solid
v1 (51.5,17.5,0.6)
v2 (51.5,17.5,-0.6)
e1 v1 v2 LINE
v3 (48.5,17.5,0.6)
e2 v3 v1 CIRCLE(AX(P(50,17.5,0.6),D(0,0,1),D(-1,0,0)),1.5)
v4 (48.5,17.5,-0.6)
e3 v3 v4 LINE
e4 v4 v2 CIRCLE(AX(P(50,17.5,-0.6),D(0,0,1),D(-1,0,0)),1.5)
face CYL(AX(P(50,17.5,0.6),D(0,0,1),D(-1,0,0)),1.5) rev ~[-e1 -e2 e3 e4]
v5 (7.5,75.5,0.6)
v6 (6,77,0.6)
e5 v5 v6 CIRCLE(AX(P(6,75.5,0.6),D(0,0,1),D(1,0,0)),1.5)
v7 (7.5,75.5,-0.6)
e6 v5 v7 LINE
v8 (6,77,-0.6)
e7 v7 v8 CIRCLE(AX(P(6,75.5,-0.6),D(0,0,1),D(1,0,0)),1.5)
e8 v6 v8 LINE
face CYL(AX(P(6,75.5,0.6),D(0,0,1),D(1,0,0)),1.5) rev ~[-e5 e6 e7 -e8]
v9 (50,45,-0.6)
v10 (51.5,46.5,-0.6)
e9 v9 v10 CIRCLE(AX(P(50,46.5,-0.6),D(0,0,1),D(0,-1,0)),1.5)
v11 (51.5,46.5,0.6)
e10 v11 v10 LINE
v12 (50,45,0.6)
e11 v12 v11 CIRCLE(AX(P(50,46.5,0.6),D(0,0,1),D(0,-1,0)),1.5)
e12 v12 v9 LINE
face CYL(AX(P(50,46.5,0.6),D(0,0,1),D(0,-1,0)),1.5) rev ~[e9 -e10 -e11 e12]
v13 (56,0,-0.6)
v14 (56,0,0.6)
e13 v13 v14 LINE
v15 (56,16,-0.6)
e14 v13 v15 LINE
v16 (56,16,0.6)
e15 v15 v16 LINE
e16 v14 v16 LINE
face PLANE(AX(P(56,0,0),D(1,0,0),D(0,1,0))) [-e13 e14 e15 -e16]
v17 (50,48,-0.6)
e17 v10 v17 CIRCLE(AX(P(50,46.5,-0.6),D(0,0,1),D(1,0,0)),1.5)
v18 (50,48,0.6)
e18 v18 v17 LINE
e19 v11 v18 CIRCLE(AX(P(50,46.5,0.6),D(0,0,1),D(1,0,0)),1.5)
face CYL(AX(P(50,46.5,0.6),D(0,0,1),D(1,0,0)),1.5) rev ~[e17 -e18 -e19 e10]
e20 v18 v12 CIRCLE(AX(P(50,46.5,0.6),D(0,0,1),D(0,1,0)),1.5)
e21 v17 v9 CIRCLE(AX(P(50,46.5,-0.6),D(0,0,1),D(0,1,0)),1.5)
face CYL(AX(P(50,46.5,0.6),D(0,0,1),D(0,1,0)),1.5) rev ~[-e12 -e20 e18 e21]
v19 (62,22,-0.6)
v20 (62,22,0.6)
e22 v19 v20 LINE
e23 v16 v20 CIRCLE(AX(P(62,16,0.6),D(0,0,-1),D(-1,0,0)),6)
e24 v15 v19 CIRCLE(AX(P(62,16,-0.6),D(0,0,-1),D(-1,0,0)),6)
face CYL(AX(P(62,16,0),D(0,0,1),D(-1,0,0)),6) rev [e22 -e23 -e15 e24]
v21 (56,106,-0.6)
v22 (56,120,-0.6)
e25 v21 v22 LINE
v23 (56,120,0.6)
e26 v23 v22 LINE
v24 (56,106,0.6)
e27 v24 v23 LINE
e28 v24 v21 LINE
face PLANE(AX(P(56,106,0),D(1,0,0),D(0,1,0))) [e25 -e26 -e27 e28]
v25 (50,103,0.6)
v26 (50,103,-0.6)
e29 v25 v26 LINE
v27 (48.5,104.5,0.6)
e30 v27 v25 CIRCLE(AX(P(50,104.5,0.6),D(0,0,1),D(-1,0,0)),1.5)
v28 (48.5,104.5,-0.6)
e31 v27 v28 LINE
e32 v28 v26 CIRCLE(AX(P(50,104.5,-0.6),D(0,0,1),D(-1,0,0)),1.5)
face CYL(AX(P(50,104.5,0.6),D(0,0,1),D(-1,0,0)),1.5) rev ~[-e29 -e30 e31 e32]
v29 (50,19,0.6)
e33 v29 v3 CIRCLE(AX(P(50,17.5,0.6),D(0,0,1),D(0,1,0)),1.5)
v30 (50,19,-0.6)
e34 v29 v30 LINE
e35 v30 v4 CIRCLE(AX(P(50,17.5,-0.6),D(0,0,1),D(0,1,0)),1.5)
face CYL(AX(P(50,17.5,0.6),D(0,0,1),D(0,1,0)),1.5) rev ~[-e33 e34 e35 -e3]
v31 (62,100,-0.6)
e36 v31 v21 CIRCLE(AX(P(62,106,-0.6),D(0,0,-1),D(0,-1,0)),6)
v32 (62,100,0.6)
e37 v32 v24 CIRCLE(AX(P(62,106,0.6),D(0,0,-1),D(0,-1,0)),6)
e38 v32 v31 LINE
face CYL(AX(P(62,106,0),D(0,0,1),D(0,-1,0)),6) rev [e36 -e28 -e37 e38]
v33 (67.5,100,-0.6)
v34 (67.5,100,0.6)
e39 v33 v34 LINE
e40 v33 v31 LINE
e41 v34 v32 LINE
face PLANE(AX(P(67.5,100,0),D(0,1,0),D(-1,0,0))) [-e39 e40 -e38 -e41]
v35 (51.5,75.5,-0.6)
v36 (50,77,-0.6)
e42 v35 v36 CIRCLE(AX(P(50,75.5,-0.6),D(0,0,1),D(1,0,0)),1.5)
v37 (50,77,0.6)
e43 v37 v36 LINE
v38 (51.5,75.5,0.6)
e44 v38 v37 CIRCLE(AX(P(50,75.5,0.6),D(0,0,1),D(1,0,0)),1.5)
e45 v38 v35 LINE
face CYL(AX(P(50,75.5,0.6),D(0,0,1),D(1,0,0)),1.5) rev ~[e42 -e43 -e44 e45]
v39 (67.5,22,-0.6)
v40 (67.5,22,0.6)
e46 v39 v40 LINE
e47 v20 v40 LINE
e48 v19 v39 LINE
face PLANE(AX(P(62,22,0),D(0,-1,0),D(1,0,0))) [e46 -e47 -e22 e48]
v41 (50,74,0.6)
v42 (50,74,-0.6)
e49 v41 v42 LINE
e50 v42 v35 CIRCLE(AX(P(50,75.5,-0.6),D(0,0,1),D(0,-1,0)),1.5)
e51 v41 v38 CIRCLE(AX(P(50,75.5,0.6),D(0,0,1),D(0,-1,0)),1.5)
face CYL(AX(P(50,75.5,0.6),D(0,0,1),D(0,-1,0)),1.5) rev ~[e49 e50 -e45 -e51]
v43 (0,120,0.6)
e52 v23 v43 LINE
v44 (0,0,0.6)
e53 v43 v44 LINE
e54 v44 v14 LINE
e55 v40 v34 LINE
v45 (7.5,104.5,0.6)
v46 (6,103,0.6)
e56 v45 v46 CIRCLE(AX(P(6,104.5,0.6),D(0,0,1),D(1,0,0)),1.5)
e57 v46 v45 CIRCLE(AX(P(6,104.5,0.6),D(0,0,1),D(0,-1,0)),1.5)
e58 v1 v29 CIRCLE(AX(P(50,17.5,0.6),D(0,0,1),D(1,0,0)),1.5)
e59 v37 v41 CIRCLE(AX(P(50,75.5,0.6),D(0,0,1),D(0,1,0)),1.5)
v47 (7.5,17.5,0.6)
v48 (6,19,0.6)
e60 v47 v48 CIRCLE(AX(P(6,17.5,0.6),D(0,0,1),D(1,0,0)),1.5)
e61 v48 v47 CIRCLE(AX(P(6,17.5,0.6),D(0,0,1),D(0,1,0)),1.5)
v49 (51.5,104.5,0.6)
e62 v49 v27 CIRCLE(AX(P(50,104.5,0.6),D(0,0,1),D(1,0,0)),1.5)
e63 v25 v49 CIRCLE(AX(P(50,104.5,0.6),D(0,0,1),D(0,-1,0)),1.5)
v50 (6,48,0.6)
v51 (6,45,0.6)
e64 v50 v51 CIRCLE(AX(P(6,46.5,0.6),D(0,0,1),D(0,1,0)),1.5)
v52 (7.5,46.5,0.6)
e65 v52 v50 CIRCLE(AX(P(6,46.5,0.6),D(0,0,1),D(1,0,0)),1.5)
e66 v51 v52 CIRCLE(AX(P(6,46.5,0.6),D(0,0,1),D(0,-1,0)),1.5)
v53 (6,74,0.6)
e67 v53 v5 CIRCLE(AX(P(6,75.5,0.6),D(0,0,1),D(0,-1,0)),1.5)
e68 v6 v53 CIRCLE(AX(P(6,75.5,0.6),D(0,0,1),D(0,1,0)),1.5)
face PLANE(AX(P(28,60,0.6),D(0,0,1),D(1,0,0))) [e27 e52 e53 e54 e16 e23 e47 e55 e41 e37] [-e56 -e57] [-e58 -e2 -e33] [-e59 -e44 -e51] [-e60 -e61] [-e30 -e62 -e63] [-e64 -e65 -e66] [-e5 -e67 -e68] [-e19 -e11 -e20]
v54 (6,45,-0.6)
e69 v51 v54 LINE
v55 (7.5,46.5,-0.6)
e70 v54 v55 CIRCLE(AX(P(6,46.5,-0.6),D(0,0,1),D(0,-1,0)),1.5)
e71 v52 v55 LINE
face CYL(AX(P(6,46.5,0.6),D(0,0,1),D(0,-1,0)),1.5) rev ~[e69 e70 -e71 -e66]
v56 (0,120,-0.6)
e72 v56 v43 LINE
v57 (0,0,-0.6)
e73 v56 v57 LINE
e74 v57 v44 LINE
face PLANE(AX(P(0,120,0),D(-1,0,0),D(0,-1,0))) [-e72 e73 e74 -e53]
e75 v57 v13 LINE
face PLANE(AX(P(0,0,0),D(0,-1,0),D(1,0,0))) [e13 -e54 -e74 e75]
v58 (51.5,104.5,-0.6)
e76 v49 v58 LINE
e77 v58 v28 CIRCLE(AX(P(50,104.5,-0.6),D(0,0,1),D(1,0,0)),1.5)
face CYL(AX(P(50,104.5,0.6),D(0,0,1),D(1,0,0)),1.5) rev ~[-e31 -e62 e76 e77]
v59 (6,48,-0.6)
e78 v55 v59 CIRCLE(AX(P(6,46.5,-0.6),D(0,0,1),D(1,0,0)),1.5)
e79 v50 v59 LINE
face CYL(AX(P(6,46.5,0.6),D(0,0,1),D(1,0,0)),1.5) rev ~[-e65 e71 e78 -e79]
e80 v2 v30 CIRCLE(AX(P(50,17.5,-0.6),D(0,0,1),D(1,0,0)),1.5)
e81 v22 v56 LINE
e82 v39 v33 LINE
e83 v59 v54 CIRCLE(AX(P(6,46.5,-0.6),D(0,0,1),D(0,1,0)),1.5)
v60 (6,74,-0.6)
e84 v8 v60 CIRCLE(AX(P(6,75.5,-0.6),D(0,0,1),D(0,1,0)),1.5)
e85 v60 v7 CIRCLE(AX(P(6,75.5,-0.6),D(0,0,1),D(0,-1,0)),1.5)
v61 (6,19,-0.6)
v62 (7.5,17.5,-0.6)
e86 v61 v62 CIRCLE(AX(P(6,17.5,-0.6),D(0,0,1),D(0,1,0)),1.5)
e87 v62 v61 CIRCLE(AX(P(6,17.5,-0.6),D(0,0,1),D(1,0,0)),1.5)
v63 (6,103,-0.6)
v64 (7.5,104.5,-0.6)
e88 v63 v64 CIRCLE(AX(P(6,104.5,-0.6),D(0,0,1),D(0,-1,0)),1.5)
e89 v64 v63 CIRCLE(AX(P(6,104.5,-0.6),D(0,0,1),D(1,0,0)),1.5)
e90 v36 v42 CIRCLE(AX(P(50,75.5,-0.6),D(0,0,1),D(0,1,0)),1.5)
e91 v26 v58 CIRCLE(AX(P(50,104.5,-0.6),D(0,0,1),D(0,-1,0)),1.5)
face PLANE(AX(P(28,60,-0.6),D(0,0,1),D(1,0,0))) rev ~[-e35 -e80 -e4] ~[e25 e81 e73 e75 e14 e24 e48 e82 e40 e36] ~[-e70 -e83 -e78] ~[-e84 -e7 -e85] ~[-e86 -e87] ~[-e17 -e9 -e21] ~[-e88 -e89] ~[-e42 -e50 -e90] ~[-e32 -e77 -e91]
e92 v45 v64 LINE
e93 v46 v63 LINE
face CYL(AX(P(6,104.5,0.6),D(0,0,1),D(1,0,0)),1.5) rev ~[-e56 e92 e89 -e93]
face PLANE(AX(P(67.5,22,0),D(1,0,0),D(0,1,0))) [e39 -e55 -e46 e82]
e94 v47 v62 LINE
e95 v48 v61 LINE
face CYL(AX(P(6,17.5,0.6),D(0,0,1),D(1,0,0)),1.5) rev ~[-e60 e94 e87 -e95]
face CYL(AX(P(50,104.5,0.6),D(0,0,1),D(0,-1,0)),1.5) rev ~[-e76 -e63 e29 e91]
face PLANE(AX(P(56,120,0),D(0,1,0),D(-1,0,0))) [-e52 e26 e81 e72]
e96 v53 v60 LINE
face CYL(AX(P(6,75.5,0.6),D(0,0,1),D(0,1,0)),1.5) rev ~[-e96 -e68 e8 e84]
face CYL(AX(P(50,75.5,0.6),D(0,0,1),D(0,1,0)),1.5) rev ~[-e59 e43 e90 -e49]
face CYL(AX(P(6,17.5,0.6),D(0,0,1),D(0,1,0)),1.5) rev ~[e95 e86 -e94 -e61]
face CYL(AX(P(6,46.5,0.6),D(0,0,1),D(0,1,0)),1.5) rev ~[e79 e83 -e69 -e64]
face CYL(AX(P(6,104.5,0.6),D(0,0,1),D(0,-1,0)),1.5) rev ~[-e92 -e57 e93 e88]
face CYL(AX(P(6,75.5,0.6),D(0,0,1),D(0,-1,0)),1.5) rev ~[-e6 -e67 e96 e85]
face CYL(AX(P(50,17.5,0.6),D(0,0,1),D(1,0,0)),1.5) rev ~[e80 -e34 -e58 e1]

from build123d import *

# Parameters (mm, degrees)
F1_DEPTH = 0.6
F3_DEPTH = 1.201


# Not quite as in the source:
# - a feature names something its author has since deleted; it is built from what else it names


with BuildPart() as f1:
    # F0 (on Top) → F1 (new body, symmetric)
    with BuildSketch(Plane.XY):
        Polygon((56, 120), (0, 120), (0, 106), (0, 0), (56, 0), (56, 16), (56, 106), align=None)
        with BuildLine():
            ThreePointArc((62, 100), (57.7573593129, 101.7573593129), (56, 106))
            Line((56, 106), (56, 16))
            ThreePointArc((56, 16), (57.7573593129, 20.2426406871), (62, 22))
            Line((62, 22), (67.5, 22))
            Line((67.5, 22), (67.5, 100))
            Line((67.5, 100), (62, 100))
        make_face()
    extrude(amount=F1_DEPTH, both=True)

    # F2 (on face) → F3 (cut, through all)
    with BuildSketch(Plane.XY.offset(0.6)):
        with BuildLine():
            Line((6, 103), (6, 104.5))
            Line((6, 104.5), (7.5, 104.5))
            ThreePointArc((7.5, 104.5), (4.9393398282, 105.5606601718), (6, 103))
        make_face()
        with BuildLine():
            Line((7.5, 104.5), (6, 104.5))
            Line((6, 104.5), (6, 103))
            ThreePointArc((6, 103), (7.0606601718, 103.4393398282), (7.5, 104.5))
        make_face()
        with BuildLine():
            ThreePointArc((51.5, 104.5), (50, 106), (48.5, 104.5))
            Line((48.5, 104.5), (50, 104.5))
            Line((50, 104.5), (50, 103))
            ThreePointArc((50, 103), (51.0606601718, 103.4393398282), (51.5, 104.5))
        make_face()
        with BuildLine():
            Line((50, 104.5), (48.5, 104.5))
            ThreePointArc((48.5, 104.5), (48.9393398282, 103.4393398282), (50, 103))
            Line((50, 103), (50, 104.5))
        make_face()
        with BuildLine():
            ThreePointArc((51.5, 75.5), (51.0606601718, 76.5606601718), (50, 77))
            Line((50, 77), (50, 75.5))
            Line((50, 75.5), (50, 74))
            ThreePointArc((50, 74), (51.0606601718, 74.4393398282), (51.5, 75.5))
        make_face()
        with BuildLine():
            Line((50, 75.5), (50, 77))
            ThreePointArc((50, 77), (48.5, 75.5), (50, 74))
            Line((50, 74), (50, 75.5))
        make_face()
        with BuildLine():
            ThreePointArc((51.5, 46.5), (51.0606601718, 47.5606601718), (50, 48))
            Line((50, 48), (50, 46.5))
            Line((50, 46.5), (50, 45))
            ThreePointArc((50, 45), (51.0606601718, 45.4393398282), (51.5, 46.5))
        make_face()
        with BuildLine():
            Line((50, 46.5), (50, 48))
            ThreePointArc((50, 48), (48.5, 46.5), (50, 45))
            Line((50, 45), (50, 46.5))
        make_face()
        with BuildLine():
            ThreePointArc((51.5, 17.5), (51.0606601718, 18.5606601718), (50, 19))
            Line((50, 19), (50, 17.5))
            Line((50, 17.5), (48.5, 17.5))
            ThreePointArc((48.5, 17.5), (50, 16), (51.5, 17.5))
        make_face()
        with BuildLine():
            Line((50, 17.5), (50, 19))
            ThreePointArc((50, 19), (48.9393398282, 18.5606601718), (48.5, 17.5))
            Line((48.5, 17.5), (50, 17.5))
        make_face()
        with BuildLine():
            Line((6, 17.5), (6, 19))
            ThreePointArc((6, 19), (4.9393398282, 16.4393398282), (7.5, 17.5))
            Line((7.5, 17.5), (6, 17.5))
        make_face()
        with BuildLine():
            ThreePointArc((7.5, 17.5), (7.0606601718, 18.5606601718), (6, 19))
            Line((6, 19), (6, 17.5))
            Line((6, 17.5), (7.5, 17.5))
        make_face()
        with BuildLine():
            Line((6, 46.5), (6, 48))
            ThreePointArc((6, 48), (4.5, 46.5), (6, 45))
            Line((6, 45), (6, 46.5))
        make_face()
        with BuildLine():
            ThreePointArc((7.5, 46.5), (7.0606601718, 47.5606601718), (6, 48))
            Line((6, 48), (6, 46.5))
            Line((6, 46.5), (6, 45))
            ThreePointArc((6, 45), (7.0606601718, 45.4393398282), (7.5, 46.5))
        make_face()
        with BuildLine():
            Line((6, 75.5), (6, 77))
            ThreePointArc((6, 77), (4.5, 75.5), (6, 74))
            Line((6, 74), (6, 75.5))
        make_face()
        with BuildLine():
            ThreePointArc((7.5, 75.5), (7.0606601718, 76.5606601718), (6, 77))
            Line((6, 77), (6, 75.5))
            Line((6, 75.5), (6, 74))
            ThreePointArc((6, 74), (7.0606601718, 74.4393398282), (7.5, 75.5))
        make_face()
    extrude(amount=-F3_DEPTH, mode=Mode.SUBTRACT)


solid = f1.part
